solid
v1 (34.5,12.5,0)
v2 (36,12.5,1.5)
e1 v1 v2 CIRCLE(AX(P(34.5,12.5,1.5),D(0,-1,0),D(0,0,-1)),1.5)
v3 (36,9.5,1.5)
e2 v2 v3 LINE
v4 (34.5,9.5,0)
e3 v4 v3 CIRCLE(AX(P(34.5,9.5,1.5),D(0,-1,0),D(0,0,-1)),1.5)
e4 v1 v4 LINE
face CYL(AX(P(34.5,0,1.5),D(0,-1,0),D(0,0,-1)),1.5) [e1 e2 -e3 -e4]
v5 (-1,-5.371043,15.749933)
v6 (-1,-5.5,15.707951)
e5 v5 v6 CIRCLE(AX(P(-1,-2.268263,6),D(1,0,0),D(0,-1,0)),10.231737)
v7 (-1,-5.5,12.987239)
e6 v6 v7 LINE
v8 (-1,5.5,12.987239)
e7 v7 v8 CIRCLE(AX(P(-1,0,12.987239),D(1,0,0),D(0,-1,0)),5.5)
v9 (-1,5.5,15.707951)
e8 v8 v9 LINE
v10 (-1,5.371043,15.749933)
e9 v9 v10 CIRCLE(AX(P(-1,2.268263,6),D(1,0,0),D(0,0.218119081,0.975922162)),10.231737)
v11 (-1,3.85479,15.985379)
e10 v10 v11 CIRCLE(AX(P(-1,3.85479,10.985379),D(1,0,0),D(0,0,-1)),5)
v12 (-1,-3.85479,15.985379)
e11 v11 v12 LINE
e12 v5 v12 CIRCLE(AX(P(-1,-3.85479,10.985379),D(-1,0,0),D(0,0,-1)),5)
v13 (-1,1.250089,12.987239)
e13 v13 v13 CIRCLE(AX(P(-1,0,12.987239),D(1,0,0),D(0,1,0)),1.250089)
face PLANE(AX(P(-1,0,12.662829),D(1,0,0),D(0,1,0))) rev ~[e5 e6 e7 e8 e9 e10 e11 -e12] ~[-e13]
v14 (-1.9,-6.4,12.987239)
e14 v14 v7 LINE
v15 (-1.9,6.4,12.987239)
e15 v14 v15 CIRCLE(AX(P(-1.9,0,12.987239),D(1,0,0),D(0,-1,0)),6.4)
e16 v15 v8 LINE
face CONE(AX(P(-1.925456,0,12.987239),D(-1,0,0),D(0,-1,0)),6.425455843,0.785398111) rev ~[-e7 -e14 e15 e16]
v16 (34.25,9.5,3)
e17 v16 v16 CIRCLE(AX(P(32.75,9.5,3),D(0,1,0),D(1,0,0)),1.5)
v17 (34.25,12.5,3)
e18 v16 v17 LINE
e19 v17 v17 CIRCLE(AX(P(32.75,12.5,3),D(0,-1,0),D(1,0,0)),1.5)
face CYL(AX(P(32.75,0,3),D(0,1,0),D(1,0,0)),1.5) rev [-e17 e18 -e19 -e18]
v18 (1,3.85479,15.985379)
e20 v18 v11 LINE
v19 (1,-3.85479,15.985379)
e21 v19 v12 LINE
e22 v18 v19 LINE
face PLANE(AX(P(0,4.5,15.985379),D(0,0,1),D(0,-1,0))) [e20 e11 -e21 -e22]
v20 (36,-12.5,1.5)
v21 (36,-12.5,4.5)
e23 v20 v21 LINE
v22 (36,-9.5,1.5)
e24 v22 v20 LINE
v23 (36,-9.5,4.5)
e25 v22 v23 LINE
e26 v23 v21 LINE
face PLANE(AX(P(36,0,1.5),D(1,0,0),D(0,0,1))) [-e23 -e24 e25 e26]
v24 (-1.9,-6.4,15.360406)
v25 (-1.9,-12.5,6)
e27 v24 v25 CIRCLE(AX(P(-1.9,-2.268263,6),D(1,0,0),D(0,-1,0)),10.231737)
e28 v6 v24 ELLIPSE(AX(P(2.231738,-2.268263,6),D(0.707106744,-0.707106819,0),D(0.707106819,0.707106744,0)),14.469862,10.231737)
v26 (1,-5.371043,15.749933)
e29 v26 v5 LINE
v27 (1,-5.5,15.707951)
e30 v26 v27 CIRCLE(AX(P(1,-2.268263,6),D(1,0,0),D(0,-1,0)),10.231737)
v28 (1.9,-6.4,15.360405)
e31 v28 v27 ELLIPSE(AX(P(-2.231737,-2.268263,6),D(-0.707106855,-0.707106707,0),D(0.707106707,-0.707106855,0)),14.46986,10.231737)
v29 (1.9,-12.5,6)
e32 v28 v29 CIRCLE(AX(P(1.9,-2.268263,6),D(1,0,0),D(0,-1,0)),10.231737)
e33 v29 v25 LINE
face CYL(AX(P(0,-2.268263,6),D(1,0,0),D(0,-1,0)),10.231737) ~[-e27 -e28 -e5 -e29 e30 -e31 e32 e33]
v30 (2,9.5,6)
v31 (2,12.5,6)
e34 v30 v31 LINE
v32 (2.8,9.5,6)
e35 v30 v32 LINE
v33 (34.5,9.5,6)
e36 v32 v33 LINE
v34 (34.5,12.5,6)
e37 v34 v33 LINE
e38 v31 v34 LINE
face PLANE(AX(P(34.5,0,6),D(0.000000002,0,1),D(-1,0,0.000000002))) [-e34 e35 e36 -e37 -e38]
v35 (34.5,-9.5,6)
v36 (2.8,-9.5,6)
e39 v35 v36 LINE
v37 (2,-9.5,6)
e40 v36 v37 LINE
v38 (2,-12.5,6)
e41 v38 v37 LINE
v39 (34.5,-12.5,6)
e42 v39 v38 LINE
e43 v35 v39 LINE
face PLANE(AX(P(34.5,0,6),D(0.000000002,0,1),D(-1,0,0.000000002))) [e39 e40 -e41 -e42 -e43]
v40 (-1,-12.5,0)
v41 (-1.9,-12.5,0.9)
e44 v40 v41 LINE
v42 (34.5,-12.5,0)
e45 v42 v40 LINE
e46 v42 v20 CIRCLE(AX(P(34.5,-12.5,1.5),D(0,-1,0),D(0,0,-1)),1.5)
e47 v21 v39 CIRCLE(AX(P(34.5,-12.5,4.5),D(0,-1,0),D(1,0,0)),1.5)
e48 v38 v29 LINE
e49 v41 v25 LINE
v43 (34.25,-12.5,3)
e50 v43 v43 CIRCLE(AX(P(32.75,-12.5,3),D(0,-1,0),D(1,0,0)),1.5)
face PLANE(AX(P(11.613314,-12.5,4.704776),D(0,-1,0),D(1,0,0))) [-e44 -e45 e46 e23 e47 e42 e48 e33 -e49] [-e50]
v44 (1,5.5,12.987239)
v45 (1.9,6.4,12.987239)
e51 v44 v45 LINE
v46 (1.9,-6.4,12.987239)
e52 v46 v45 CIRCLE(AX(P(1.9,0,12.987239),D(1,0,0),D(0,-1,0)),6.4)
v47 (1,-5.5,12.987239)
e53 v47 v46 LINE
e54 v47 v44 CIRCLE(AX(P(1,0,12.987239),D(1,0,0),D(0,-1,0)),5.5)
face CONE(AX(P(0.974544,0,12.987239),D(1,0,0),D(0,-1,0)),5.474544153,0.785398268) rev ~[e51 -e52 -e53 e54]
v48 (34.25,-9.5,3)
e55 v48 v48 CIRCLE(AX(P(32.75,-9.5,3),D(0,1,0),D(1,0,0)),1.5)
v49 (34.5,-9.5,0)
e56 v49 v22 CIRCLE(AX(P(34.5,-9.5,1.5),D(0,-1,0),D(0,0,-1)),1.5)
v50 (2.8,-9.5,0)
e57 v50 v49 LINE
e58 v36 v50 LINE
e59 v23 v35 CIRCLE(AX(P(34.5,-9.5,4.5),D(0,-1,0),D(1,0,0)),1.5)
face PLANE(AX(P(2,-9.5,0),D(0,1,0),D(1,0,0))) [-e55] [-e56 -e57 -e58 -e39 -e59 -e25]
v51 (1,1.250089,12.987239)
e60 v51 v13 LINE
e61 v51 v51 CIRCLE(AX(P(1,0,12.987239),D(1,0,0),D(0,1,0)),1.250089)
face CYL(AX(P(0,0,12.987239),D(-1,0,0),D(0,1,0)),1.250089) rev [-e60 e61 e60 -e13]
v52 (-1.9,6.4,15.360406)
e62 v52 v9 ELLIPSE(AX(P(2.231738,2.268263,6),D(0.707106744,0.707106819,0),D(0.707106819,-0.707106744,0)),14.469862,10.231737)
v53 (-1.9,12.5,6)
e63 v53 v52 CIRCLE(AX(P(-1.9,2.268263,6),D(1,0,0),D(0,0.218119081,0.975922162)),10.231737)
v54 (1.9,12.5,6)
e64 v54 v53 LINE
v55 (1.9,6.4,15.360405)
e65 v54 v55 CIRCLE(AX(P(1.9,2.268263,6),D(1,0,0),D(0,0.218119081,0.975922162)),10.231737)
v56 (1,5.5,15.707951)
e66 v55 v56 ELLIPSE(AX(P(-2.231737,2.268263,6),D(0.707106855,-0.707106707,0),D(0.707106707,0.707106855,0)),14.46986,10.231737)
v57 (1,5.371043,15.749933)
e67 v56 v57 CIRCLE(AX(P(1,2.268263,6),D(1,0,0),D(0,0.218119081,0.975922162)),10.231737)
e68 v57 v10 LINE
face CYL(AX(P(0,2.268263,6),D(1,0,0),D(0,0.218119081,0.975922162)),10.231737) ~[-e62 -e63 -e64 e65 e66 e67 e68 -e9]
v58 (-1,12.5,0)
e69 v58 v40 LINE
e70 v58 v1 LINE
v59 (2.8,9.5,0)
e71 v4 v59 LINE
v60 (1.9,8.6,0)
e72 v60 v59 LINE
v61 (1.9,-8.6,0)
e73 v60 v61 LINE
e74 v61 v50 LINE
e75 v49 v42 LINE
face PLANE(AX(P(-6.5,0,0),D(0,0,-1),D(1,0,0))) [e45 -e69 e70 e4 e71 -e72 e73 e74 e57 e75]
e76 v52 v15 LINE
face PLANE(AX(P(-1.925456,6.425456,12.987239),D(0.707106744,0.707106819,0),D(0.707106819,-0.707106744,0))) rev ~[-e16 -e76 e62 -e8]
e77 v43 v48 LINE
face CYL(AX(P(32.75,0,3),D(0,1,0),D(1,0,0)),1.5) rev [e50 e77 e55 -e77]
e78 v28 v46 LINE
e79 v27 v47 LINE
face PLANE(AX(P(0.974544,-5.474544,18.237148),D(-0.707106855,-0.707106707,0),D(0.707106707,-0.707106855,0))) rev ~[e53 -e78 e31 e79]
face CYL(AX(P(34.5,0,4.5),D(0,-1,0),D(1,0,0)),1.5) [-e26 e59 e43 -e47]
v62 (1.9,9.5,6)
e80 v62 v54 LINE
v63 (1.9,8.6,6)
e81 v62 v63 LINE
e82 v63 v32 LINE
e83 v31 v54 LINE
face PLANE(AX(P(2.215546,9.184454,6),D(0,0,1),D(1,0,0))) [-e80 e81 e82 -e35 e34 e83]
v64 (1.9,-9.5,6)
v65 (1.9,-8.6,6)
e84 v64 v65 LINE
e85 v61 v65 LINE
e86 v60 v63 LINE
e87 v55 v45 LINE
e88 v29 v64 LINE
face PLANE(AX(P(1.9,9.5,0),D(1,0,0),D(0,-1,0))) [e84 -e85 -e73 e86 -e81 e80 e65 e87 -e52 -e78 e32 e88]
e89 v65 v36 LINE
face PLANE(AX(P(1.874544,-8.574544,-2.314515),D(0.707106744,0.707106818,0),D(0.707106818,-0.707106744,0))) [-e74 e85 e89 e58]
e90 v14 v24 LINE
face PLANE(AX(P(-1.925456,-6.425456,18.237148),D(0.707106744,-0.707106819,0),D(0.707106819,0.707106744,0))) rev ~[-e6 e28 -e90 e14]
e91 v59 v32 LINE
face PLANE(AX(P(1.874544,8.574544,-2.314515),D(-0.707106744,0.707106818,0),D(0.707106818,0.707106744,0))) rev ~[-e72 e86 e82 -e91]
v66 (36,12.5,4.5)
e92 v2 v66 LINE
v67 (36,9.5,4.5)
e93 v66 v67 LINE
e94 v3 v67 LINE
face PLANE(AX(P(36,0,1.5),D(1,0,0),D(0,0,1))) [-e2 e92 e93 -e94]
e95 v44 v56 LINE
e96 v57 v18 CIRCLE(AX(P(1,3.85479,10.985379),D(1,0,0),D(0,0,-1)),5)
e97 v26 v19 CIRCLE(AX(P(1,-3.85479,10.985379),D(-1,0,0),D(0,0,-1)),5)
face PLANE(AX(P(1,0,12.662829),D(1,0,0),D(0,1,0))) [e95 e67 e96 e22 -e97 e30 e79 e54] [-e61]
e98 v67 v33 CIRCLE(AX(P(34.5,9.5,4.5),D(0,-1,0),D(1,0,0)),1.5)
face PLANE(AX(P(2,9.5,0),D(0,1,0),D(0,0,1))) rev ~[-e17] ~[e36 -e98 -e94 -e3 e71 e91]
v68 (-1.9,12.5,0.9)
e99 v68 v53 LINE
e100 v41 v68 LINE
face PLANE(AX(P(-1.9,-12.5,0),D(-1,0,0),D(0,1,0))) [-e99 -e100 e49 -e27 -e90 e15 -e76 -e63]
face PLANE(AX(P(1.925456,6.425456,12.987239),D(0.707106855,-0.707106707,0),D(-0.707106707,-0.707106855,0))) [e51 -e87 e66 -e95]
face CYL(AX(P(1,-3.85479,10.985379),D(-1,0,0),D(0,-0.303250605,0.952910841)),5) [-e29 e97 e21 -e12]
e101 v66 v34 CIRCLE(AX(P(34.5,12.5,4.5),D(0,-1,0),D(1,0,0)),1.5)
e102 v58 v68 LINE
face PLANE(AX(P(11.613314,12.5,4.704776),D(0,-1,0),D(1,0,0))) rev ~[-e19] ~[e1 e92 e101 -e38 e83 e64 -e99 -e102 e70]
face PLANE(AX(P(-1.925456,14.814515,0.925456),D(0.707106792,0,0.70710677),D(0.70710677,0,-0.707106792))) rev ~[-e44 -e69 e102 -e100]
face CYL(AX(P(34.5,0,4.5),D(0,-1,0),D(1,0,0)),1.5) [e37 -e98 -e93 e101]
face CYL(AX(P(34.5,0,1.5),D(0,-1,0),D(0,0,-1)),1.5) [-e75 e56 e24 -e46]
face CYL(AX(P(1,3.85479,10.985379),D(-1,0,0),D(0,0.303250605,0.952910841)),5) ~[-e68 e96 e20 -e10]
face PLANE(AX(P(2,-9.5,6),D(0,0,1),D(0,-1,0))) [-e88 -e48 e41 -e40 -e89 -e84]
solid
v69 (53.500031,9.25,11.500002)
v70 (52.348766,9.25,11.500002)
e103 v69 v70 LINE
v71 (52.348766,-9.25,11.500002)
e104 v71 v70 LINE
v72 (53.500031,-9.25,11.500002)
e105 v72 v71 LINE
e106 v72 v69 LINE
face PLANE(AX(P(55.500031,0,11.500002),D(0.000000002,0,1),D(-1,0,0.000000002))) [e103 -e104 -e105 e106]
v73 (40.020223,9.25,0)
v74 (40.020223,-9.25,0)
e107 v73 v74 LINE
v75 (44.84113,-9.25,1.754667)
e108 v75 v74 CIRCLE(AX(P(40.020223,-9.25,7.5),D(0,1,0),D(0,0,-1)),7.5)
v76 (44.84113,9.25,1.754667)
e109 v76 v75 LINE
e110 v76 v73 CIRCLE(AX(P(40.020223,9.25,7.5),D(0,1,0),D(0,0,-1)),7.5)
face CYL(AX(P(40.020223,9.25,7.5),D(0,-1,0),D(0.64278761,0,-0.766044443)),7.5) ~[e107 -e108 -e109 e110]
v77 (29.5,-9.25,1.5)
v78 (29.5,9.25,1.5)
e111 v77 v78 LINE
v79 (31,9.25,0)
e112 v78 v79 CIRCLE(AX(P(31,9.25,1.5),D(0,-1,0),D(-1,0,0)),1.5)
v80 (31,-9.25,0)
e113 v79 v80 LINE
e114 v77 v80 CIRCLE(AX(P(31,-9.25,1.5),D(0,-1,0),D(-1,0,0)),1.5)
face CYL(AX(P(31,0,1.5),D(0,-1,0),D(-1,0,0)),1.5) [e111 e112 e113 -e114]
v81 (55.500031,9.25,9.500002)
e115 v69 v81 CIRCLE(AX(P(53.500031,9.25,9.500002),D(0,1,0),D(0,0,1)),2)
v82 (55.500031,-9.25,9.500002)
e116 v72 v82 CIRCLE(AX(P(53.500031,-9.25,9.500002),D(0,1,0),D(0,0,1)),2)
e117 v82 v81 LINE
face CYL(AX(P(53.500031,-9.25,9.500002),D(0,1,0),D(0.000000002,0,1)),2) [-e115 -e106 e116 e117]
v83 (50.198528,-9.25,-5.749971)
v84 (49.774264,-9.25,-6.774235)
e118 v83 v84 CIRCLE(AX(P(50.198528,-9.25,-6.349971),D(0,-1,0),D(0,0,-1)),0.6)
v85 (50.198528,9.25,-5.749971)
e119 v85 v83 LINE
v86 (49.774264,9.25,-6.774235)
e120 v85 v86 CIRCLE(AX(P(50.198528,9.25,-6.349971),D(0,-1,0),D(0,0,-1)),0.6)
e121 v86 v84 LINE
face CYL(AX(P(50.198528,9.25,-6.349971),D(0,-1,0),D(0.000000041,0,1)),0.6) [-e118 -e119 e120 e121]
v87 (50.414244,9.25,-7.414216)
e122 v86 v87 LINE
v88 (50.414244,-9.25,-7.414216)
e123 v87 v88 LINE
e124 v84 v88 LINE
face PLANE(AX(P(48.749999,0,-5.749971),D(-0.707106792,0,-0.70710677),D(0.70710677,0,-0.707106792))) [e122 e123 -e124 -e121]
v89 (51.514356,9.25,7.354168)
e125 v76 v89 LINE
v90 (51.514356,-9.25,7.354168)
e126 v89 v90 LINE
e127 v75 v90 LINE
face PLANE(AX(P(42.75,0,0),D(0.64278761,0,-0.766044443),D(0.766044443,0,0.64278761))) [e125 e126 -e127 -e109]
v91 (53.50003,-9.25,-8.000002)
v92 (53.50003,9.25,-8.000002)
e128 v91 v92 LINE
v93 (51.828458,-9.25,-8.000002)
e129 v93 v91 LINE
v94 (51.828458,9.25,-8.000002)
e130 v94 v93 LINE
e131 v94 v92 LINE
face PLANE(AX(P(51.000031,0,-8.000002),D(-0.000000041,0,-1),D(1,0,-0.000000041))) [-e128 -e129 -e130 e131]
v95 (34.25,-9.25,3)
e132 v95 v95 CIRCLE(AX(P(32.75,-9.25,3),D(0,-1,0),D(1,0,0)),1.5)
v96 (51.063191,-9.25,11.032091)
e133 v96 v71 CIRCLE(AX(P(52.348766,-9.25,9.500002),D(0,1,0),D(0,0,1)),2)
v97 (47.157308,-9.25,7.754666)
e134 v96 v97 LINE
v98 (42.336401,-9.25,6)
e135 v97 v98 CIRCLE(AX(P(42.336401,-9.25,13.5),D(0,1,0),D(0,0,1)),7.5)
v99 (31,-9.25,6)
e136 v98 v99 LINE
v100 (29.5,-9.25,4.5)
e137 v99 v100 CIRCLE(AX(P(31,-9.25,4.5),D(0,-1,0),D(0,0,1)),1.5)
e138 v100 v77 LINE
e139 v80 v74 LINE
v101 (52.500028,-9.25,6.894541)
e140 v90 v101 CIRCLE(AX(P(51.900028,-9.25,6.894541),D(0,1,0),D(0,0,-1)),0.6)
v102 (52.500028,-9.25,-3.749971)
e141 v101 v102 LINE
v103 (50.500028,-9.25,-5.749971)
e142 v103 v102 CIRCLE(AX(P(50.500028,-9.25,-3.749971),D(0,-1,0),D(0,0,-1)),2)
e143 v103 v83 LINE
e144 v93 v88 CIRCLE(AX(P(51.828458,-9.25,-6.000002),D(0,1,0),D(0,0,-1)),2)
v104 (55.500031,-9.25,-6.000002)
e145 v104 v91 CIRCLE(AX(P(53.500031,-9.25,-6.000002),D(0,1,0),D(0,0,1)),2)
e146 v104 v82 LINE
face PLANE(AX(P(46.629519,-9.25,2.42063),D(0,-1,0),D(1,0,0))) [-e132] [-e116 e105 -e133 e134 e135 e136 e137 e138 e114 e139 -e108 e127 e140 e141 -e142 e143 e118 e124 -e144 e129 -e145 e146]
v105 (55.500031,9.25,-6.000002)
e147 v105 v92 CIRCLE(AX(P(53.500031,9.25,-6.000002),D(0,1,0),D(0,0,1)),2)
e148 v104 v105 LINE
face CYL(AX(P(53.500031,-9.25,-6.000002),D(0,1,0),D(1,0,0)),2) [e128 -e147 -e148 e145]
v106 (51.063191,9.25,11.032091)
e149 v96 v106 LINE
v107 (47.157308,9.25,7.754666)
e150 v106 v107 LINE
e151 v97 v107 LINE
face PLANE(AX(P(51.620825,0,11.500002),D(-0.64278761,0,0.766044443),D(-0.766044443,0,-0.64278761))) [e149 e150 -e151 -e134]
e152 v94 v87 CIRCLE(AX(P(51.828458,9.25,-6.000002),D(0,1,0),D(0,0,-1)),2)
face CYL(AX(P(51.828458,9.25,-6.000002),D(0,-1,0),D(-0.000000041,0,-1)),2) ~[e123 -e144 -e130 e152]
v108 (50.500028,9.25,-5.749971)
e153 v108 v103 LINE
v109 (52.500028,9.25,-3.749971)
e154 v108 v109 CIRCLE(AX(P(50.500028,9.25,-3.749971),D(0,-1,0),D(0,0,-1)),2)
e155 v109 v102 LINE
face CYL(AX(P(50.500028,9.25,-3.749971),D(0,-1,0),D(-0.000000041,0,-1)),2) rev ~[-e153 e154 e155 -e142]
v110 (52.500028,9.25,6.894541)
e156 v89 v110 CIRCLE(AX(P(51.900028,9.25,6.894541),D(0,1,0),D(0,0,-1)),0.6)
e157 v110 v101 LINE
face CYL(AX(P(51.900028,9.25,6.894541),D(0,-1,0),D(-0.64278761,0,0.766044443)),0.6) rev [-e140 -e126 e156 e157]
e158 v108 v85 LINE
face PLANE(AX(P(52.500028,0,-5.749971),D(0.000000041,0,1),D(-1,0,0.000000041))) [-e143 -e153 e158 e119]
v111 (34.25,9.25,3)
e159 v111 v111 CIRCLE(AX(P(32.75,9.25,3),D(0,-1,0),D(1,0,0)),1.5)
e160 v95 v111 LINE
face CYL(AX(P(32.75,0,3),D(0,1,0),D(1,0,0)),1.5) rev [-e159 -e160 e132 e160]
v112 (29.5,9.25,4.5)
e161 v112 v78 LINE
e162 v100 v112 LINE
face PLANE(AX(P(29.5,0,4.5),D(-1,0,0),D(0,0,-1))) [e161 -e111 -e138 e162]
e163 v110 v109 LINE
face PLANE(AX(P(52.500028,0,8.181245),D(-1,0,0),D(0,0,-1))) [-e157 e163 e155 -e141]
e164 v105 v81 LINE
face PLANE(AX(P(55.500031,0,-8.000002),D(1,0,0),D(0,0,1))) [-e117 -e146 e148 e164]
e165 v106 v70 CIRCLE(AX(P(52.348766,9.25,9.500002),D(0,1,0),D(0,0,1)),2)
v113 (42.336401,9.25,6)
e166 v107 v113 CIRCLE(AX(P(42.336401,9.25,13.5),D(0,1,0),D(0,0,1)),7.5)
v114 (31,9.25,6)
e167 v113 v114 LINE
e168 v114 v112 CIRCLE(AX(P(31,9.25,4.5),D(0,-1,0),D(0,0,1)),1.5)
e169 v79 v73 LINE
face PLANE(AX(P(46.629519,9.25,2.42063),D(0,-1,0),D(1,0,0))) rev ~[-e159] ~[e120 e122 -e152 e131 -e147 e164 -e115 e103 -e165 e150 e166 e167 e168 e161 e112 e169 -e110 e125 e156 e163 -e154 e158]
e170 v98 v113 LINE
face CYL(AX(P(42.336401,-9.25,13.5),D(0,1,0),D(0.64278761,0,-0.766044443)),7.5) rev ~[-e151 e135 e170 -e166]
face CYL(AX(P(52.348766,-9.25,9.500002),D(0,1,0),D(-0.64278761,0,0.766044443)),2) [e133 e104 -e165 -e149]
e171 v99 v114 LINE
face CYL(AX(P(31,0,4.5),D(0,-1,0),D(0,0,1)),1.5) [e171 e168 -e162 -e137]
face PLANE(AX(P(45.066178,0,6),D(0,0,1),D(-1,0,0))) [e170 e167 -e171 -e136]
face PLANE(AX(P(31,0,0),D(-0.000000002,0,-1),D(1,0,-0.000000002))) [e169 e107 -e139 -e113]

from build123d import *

# Parameters (mm, degrees)
F2_R          = 1.5
F5_DEPTH      = 12.5
F3_W          = 57.0000079349
F3_H          = 35
F3_W_2        = 5.9000002086
F3_H_2        = 3.0000003055
F6_DEPTH      = 25
F0_W          = 40
F0_H          = 30
F0_R          = 1.2500888111
F7_DEPTH      = 2
F8_DEPTH      = 1
F9_DEPTH      = 0.1
F10_DEPTH     = 0.1
F11_T4_DEPTH  = 8.3145145654
F11_T9_DEPTH  = 8.3145145654
F11_T11_DEPTH = 29.6290293933
F11_T16_ANGLE = 180
F11_T21_ANGLE = 180
F11_T26_DEPTH = 5.2499087538
F11_T31_DEPTH = 5.2499087441
F11_T36_DEPTH = 5.2499087441
F11_T41_DEPTH = 5.2499087538
F4_R          = 1.5
F12_DEPTH     = 9.25
F13_R         = 2
F14_R         = 7.5
F15_R         = 0.6
F1_W          = 40
F1_H          = 30
F16_DEPTH     = 12.5
F17_R         = 5


# Not quite as in the source:
# - a fillet or chamfer that OpenCascade refuses, or shapes differently, is made with other operations: its cross-section is extruded or revolved along the edge and cut away or added
# - ends of sketch curves that miss each other by under 0.0002 mm in the source are joined


with BuildPart() as f5:
    # F2 (on Front) → F5 (new body, symmetric)
    with BuildSketch(Plane.XZ):
        with BuildLine():
            Line((-6.5000004037, -1.225e-07), (34.4999995679, -1.225e-07))
            ThreePointArc((34.4999995679, -1.225e-07), (35.5606597229, 0.4393396988), (35.9999995441, 1.4999998538))
            Line((35.9999995441, 1.4999998538), (35.9999995441, 4.4999998063))
            ThreePointArc((35.9999995441, 4.4999998063), (35.5606597229, 5.5606599613), (34.4999995679, 5.9999997825))
            Line((34.4999995706, 5.9999997825), (1.9999998119, 5.9999998409))
            Line((1.9999998119, 5.999999905), (1.9999998119, 16))
            Line((1.9999998119, 16), (-2.000000095, 16))
            Line((-2.000000095, 16), (-2.000000095, 5.9999998557))
            Line((-2.000000095, 5.9999997745), (-6.500000401, 5.9999997825))
            ThreePointArc((-6.5000004037, 5.9999997825), (-7.5606605587, 5.5606599613), (-8.00000038, 4.4999998063))
            Line((-8.00000038, 4.4999998063), (-8.00000038, 1.4999998538))
            ThreePointArc((-8.00000038, 1.4999998538), (-7.5606605587, 0.4393396988), (-6.5000004037, -1.225e-07))
        make_face()
        with Locations((-4.7500003907, 2.9999998668)):
            Circle(F2_R, mode=Mode.SUBTRACT)
        with Locations((32.7499995548, 2.99999983)):
            Circle(F2_R, mode=Mode.SUBTRACT)
    extrude(amount=F5_DEPTH, both=True)

    # F3 (on Top) → F6 (cut)
    with BuildSketch(Plane.XY):
        with Locations((15.4999917634, -7.45e-08)):
            Rectangle(F3_W, F3_H)
        Polygon((-7.9000002086, 12.5), (-2, 12.5), (1.9999999069, 12.5), (35.9999998473, 12.5), (35.9999998473, 9.4999996945), (1.9999999069, 9.4999996945), (1.9999999069, -9.4999996945), (35.9999998473, -9.4999996945), (35.9999998473, -12.5), (1.9999999069, -12.5), (-2, -12.5), (-7.9000002086, -12.5), (-7.9000002086, -9.4999996945), (-2, -9.4999996945), (-2, 9.4999996945), (-7.9000002086, 9.4999996945), align=None, mode=Mode.SUBTRACT)
        with Locations((-4.9500001043, 10.9999998473)):
            Rectangle(F3_W_2, F3_H_2)
        with Locations((-4.9500001043, -10.9999998473)):
            Rectangle(F3_W_2, F3_H_2)
    extrude(amount=F6_DEPTH, mode=Mode.SUBTRACT)

    # F0 (on Right) → F7 (cut, symmetric)
    with BuildSketch(Plane.YZ):
        with Locations((4.47e-07, 7.9853728972)):
            Rectangle(F0_W, F0_H)
        with BuildLine():
            Line((12.5, -0.0146211902), (-12.5, -0.0146211902))
            Line((-12.5, -0.0146211902), (-12.5, 7.9853788098))
            ThreePointArc((-12.5, 7.9853788098), (-10.5000000081, 13.276881496), (-5.5, 15.9226329138))
            ThreePointArc((-5.5, 15.9226329138), (-5.000983204, 15.9696770716), (-4.4999998063, 15.9853790035))
            Line((-4.4999998063, 15.9853790035), (4.4999998063, 15.9853790035))
            ThreePointArc((4.4999998063, 15.9853790035), (5.000983204, 15.9696770716), (5.5, 15.9226329138))
            ThreePointArc((5.5, 15.9226329138), (10.5000000081, 13.276881496), (12.5, 7.9853788098))
            Line((12.5, 7.9853788098), (12.5, -0.0146211902))
        make_face(mode=Mode.SUBTRACT)
        with BuildLine():
            ThreePointArc((-4.4999998063, 15.9853790035), (-5.000983204, 15.9696770716), (-5.5, 15.9226329138))
            Line((-5.5, 15.9226329138), (-5.5, 12.9872388524))
            ThreePointArc((-5.5, 12.9872388524), (0, 7.4872388524), (5.5, 12.9872388524))
            Line((5.5, 12.9872388524), (5.5, 15.9226329138))
            ThreePointArc((5.5, 15.9226329138), (5.000983204, 15.9696770716), (4.4999998063, 15.9853790035))
            Line((4.4999998063, 15.9853790035), (-4.4999998063, 15.9853790035))
        make_face()
        with Locations((0, 12.9872388524)):
            Circle(F0_R, mode=Mode.SUBTRACT)
        with Locations((0, 12.9872388524)):
            Circle(F0_R)
    extrude(amount=F7_DEPTH, both=True, mode=Mode.SUBTRACT)

    # F0 (on Right) → F8 (join, symmetric)
    with BuildSketch(Plane.YZ):
        with BuildLine():
            ThreePointArc((-4.4999998063, 15.9853790035), (-5.000983204, 15.9696770716), (-5.5, 15.9226329138))
            Line((-5.5, 15.9226329138), (-5.5, 12.9872388524))
            ThreePointArc((-5.5, 12.9872388524), (0, 7.4872388524), (5.5, 12.9872388524))
            Line((5.5, 12.9872388524), (5.5, 15.9226329138))
            ThreePointArc((5.5, 15.9226329138), (5.000983204, 15.9696770716), (4.4999998063, 15.9853790035))
            Line((4.4999998063, 15.9853790035), (-4.4999998063, 15.9853790035))
        make_face()
        with Locations((0, 12.9872388524)):
            Circle(F0_R, mode=Mode.SUBTRACT)
    extrude(amount=F8_DEPTH, both=True)

    # F9 (cut): a face of the model
    f9_faces = [f5.faces().sort_by_distance(p)[0] for p in [
        (1.9999998119, 0, 6.6984167583),
    ]]
    extrude(f9_faces, amount=-F9_DEPTH, mode=Mode.SUBTRACT)

    # F10 (cut): a face of the model
    f10_faces = [f5.faces().sort_by_distance(p)[0] for p in [
        (-2.000000095, 0, 6.2419959068),
    ]]
    extrude(f10_faces, amount=-F10_DEPTH, mode=Mode.SUBTRACT)

    # F11: chamfer of 0.9 on 9 edges, made by hand


with BuildPart() as f11_tool2:
    # F11_s3 → F11_t4 (new body)
    with BuildSketch(Plane.XY.offset(-2.3145146924)):
        with BuildLine():
            Line((1.8745439664, 8.5745438517), (2.8254557523, 9.5254555373))
            Line((2.8254557523, 9.5254555373), (2.8254557523, 9.5434555373))
            ThreePointArc((2.8254557523, 9.5434555373), (2.3627278296, 9.5179996945), (1.8999999069, 9.5179996945))
            Line((1.8999999069, 9.5179996945), (1.8819999069, 9.4999996945))
            ThreePointArc((1.8819999069, 9.4999996945), (1.8819998119, 9.0372717731), (1.8565439664, 8.5745438517))
            Line((1.8565439664, 8.5745438517), (1.8745439664, 8.5745438517))
        make_face()
    extrude(amount=F11_T4_DEPTH)

    split(bisect_by=Plane.XY.offset(-1.225e-07), keep=Keep.TOP)


with BuildPart() as f5_1:
    add(f5.part)

    # F11_t1: union F11_tool2
    add(f11_tool2.part)


with BuildPart() as f11_tool7:
    # F11_s8 → F11_t9 (new body)
    with BuildSketch(Plane.XY.offset(-2.3145146924)):
        with BuildLine():
            Line((1.8745439664, -8.5745438517), (2.8254557523, -9.5254555373))
            Line((2.8254557523, -9.5254555373), (2.8254557523, -9.5434555373))
            ThreePointArc((2.8254557523, -9.5434555373), (2.3627278296, -9.5179996945), (1.8999999069, -9.5179996945))
            Line((1.8999999069, -9.5179996945), (1.8819999069, -9.4999996945))
            ThreePointArc((1.8819999069, -9.4999996945), (1.8819998119, -9.0372717731), (1.8565439664, -8.5745438517))
            Line((1.8565439664, -8.5745438517), (1.8745439664, -8.5745438517))
        make_face()
    extrude(amount=F11_T9_DEPTH)

    split(bisect_by=Plane.XY.offset(-1.225e-07), keep=Keep.TOP)


with BuildPart() as f5_2:
    add(f5_1.part)

    # F11_t6: union F11_tool7
    add(f11_tool7.part)

    # F11_s12 → F11_t11 (cut)
    with BuildSketch(Plane.XZ.offset(-14.8145146966)):
        with BuildLine():
            Line((-1.9254559387, 0.9254558445), (-0.9745441563, -0.025455967))
            Line((-0.9745441563, -0.025455967), (-0.9745441563, -0.043455967))
            ThreePointArc((-0.9745441563, -0.043455967), (-1.4372720781, -0.0180001225), (-1.9, -0.018))
            Line((-1.9, -0.018), (-1.918, 0))
            ThreePointArc((-1.918, 0), (-1.918000095, 0.4627279223), (-1.9434559387, 0.9254558445))
            Line((-1.9434559387, 0.9254558445), (-1.9254559387, 0.9254558445))
        make_face()
    extrude(amount=F11_T11_DEPTH, mode=Mode.SUBTRACT)


with BuildPart() as f11_tool14:
    # F11_s15 → F11_t16 (revolve)
    with BuildSketch(Plane.XY.offset(12.9872388524)):
        with BuildLine():
            Line((0.9745441585, -5.4745441532), (1.9254556533, -6.4254558468))
            Line((1.9254556533, -6.4254558468), (1.9434556533, -6.4254558468))
            ThreePointArc((1.9434556533, -6.4254558468), (1.9179998119, -5.9627279234), (1.918, -5.5))
            Line((1.918, -5.5), (1.9, -5.482))
            ThreePointArc((1.9, -5.482), (1.4372720793, -5.482), (0.9745441585, -5.4565441532))
            Line((0.9745441585, -5.4565441532), (0.9745441585, -5.4745441532))
        make_face()
    revolve(axis=Axis((1.9, 0, 12.9872388524), (1, 0, 0)), revolution_arc=F11_T16_ANGLE)

    split(bisect_by=Plane.YZ.offset(1), keep=Keep.TOP)


with BuildPart() as f5_3:
    add(f5_2.part)

    # F11_t13: cut F11_tool14
    add(f11_tool14.part, mode=Mode.SUBTRACT)


with BuildPart() as f11_tool19:
    # F11_s20 → F11_t21 (revolve)
    with BuildSketch(Plane.XY.offset(12.9872388524)):
        with BuildLine():
            Line((-1.9254559405, -6.4254558428), (-0.9745441545, -5.4745441572))
            Line((-0.9745441545, -5.4745441572), (-0.9745441545, -5.4565441572))
            ThreePointArc((-0.9745441545, -5.4565441572), (-1.4372720773, -5.482), (-1.9, -5.482))
            Line((-1.9, -5.482), (-1.918, -5.5))
            ThreePointArc((-1.918, -5.5), (-1.918000095, -5.9627279214), (-1.9434559405, -6.4254558428))
            Line((-1.9434559405, -6.4254558428), (-1.9254559405, -6.4254558428))
        make_face()
    revolve(axis=Axis((-1.9, 0, 12.9872388524), (1, 0, 0)), revolution_arc=F11_T21_ANGLE)

    split(bisect_by=Plane.YZ.offset(-1), keep=Keep.BOTTOM)


with BuildPart() as f5_4:
    add(f5_3.part)

    # F11_t18: cut F11_tool19
    add(f11_tool19.part, mode=Mode.SUBTRACT)


with BuildPart() as f11_tool24:
    # F11_s25 → F11_t26 (new body)
    with BuildSketch(Plane.XY.offset(12.9872388524)):
        with BuildLine():
            Line((-1.9254559405, 6.4254558428), (-0.9745441545, 5.4745441572))
            Line((-0.9745441545, 5.4745441572), (-0.9745441545, 5.4565441572))
            ThreePointArc((-0.9745441545, 5.4565441572), (-1.4372720773, 5.482), (-1.9, 5.482))
            Line((-1.9, 5.482), (-1.918, 5.5))
            ThreePointArc((-1.918, 5.5), (-1.918000095, 5.9627279214), (-1.9434559405, 6.4254558428))
            Line((-1.9434559405, 6.4254558428), (-1.9254559405, 6.4254558428))
        make_face()
    extrude(amount=F11_T26_DEPTH)

    split(bisect_by=Plane.YZ.offset(-1), keep=Keep.BOTTOM)


with BuildPart() as f5_5:
    add(f5_4.part)

    # F11_t23: cut F11_tool24
    add(f11_tool24.part, mode=Mode.SUBTRACT)


with BuildPart() as f11_tool29:
    # F11_s30 → F11_t31 (new body)
    with BuildSketch(Plane.XY.offset(12.9872388524)):
        with BuildLine():
            Line((1.9254556533, 6.4254558468), (0.9745441585, 5.4745441532))
            Line((0.9745441585, 5.4745441532), (0.9745441585, 5.4565441532))
            ThreePointArc((0.9745441585, 5.4565441532), (1.4372720793, 5.482), (1.9, 5.482))
            Line((1.9, 5.482), (1.918, 5.5))
            ThreePointArc((1.918, 5.5), (1.9179998119, 5.9627279234), (1.9434556533, 6.4254558468))
            Line((1.9434556533, 6.4254558468), (1.9254556533, 6.4254558468))
        make_face()
    extrude(amount=F11_T31_DEPTH)

    split(bisect_by=Plane.YZ.offset(1), keep=Keep.TOP)


with BuildPart() as f5_6:
    add(f5_5.part)

    # F11_t28: cut F11_tool29
    add(f11_tool29.part, mode=Mode.SUBTRACT)


with BuildPart() as f11_tool34:
    # F11_s35 → F11_t36 (new body)
    with BuildSketch(Plane.XY.offset(18.2371475965)):
        with BuildLine():
            Line((0.9745441585, -5.4745441532), (1.9254556533, -6.4254558468))
            Line((1.9254556533, -6.4254558468), (1.9434556533, -6.4254558468))
            ThreePointArc((1.9434556533, -6.4254558468), (1.9179998119, -5.9627279234), (1.918, -5.5))
            Line((1.918, -5.5), (1.9, -5.482))
            ThreePointArc((1.9, -5.482), (1.4372720793, -5.482), (0.9745441585, -5.4565441532))
            Line((0.9745441585, -5.4565441532), (0.9745441585, -5.4745441532))
        make_face()
    extrude(amount=-F11_T36_DEPTH)

    split(bisect_by=Plane.YZ.offset(1), keep=Keep.TOP)


with BuildPart() as f5_7:
    add(f5_6.part)

    # F11_t33: cut F11_tool34
    add(f11_tool34.part, mode=Mode.SUBTRACT)


with BuildPart() as f11_tool39:
    # F11_s40 → F11_t41 (new body)
    with BuildSketch(Plane.XY.offset(18.2371476062)):
        with BuildLine():
            Line((-1.9254559405, -6.4254558428), (-0.9745441545, -5.4745441572))
            Line((-0.9745441545, -5.4745441572), (-0.9745441545, -5.4565441572))
            ThreePointArc((-0.9745441545, -5.4565441572), (-1.4372720773, -5.482), (-1.9, -5.482))
            Line((-1.9, -5.482), (-1.918, -5.5))
            ThreePointArc((-1.918, -5.5), (-1.918000095, -5.9627279214), (-1.9434559405, -6.4254558428))
            Line((-1.9434559405, -6.4254558428), (-1.9254559405, -6.4254558428))
        make_face()
    extrude(amount=-F11_T41_DEPTH)

    split(bisect_by=Plane.YZ.offset(-1), keep=Keep.BOTTOM)


with BuildPart() as f5_8:
    add(f5_7.part)

    # F11_t38: cut F11_tool39
    add(f11_tool39.part, mode=Mode.SUBTRACT)

    # F1 (on Right) → F16 (cut, symmetric)
    with BuildSketch(Plane.YZ):
        with Locations((4.47e-07, 7.9853728972)):
            Rectangle(F1_W, F1_H)
        with BuildLine():
            Line((-4.4999998063, 15.9853790035), (4.4999998063, 15.9853790035))
            ThreePointArc((4.4999998063, 15.9853790035), (10.2533424116, 12.3974172553), (12.5, 5.9999997825))
            Line((12.5, 5.9999997825), (12.5, -0.0146211902))
            Line((12.5, -0.0146211902), (-12.5, -0.0146211902))
            Line((-12.5, -0.0146211902), (-12.5, 5.9999997825))
            ThreePointArc((-12.5, 5.9999997825), (-10.2533424116, 12.3974172553), (-4.4999998063, 15.9853790035))
        make_face(mode=Mode.SUBTRACT)
    extrude(amount=F16_DEPTH, both=True, mode=Mode.SUBTRACT)

    # F17
    f17_edges = [f5_8.edges().sort_by_distance(p)[0] for p in [
        (0, -4.5, 15.985379),
        (0, 4.5, 15.985379),
    ]]
    fillet(f17_edges, radius=F17_R)


with BuildPart() as f12:
    # F4 (on Front) → F12 (new body, symmetric)
    with BuildSketch(Plane.XZ):
        with BuildLine():
            ThreePointArc((29.4999995655, 1.4999998538), (29.9393393859, 0.4393396997), (30.9999995391, -1.225e-07))
            Line((30.9999995391, -1.225e-07), (42.7499995548, -1.436e-07))
            Line((42.7499995548, -1.436e-07), (52.5000281632, 8.1812452657))
            Line((52.5000281632, 8.1812452657), (52.5000281632, -5.7499710164))
            Line((52.5000281632, -5.7499710164), (48.7499994809, -5.7499708617))
            Line((48.7499994809, -5.7499708617), (51.0000307917, -8.0000022426))
            Line((51.0000307917, -8.0000022426), (55.5000305176, -8.0000024282))
            Line((55.5000305176, -8.0000024282), (55.5000305176, 11.5000018742))
            Line((55.5000305176, 11.5000018742), (51.6208254365, 11.5000018812))
            Line((51.6208254365, 11.5000018812), (45.0661781761, 5.9999997825))
            Line((45.0661781761, 5.9999997825), (30.9999995418, 5.9999997825))
            ThreePointArc((30.9999995418, 5.9999997825), (29.9393393868, 5.5606599613), (29.4999995655, 4.4999998063))
            Line((29.4999995655, 4.4999998063), (29.4999995655, 1.4999998538))
        make_face()
        with Locations((32.7499995548, 2.99999983)):
            Circle(F4_R, mode=Mode.SUBTRACT)
    extrude(amount=F12_DEPTH, both=True)

    # F13
    f13_edges = [f12.edges().sort_by_distance(p)[0] for p in [
        (51.620825, 0, 11.500002),
        (55.500031, 0, 11.500002),
        (55.500031, 0, -8.000002),
        (51.000031, 0, -8.000002),
        (52.500028, 0, -5.749971),
    ]]
    fillet(f13_edges, radius=F13_R)

    # F14
    f14_edges = [f12.edges().sort_by_distance(p)[0] for p in [
        (45.066178, 0, 6),
        (42.75, 0, 0),
    ]]
    fillet(f14_edges, radius=F14_R)

    # F15
    f15_edges = [f12.edges().sort_by_distance(p)[0] for p in [
        (52.500028, 0, 8.181245),
        (48.749999, 0, -5.749971),
    ]]
    fillet(f15_edges, radius=F15_R)


solid = Compound([f5_8.part, f12.part])
